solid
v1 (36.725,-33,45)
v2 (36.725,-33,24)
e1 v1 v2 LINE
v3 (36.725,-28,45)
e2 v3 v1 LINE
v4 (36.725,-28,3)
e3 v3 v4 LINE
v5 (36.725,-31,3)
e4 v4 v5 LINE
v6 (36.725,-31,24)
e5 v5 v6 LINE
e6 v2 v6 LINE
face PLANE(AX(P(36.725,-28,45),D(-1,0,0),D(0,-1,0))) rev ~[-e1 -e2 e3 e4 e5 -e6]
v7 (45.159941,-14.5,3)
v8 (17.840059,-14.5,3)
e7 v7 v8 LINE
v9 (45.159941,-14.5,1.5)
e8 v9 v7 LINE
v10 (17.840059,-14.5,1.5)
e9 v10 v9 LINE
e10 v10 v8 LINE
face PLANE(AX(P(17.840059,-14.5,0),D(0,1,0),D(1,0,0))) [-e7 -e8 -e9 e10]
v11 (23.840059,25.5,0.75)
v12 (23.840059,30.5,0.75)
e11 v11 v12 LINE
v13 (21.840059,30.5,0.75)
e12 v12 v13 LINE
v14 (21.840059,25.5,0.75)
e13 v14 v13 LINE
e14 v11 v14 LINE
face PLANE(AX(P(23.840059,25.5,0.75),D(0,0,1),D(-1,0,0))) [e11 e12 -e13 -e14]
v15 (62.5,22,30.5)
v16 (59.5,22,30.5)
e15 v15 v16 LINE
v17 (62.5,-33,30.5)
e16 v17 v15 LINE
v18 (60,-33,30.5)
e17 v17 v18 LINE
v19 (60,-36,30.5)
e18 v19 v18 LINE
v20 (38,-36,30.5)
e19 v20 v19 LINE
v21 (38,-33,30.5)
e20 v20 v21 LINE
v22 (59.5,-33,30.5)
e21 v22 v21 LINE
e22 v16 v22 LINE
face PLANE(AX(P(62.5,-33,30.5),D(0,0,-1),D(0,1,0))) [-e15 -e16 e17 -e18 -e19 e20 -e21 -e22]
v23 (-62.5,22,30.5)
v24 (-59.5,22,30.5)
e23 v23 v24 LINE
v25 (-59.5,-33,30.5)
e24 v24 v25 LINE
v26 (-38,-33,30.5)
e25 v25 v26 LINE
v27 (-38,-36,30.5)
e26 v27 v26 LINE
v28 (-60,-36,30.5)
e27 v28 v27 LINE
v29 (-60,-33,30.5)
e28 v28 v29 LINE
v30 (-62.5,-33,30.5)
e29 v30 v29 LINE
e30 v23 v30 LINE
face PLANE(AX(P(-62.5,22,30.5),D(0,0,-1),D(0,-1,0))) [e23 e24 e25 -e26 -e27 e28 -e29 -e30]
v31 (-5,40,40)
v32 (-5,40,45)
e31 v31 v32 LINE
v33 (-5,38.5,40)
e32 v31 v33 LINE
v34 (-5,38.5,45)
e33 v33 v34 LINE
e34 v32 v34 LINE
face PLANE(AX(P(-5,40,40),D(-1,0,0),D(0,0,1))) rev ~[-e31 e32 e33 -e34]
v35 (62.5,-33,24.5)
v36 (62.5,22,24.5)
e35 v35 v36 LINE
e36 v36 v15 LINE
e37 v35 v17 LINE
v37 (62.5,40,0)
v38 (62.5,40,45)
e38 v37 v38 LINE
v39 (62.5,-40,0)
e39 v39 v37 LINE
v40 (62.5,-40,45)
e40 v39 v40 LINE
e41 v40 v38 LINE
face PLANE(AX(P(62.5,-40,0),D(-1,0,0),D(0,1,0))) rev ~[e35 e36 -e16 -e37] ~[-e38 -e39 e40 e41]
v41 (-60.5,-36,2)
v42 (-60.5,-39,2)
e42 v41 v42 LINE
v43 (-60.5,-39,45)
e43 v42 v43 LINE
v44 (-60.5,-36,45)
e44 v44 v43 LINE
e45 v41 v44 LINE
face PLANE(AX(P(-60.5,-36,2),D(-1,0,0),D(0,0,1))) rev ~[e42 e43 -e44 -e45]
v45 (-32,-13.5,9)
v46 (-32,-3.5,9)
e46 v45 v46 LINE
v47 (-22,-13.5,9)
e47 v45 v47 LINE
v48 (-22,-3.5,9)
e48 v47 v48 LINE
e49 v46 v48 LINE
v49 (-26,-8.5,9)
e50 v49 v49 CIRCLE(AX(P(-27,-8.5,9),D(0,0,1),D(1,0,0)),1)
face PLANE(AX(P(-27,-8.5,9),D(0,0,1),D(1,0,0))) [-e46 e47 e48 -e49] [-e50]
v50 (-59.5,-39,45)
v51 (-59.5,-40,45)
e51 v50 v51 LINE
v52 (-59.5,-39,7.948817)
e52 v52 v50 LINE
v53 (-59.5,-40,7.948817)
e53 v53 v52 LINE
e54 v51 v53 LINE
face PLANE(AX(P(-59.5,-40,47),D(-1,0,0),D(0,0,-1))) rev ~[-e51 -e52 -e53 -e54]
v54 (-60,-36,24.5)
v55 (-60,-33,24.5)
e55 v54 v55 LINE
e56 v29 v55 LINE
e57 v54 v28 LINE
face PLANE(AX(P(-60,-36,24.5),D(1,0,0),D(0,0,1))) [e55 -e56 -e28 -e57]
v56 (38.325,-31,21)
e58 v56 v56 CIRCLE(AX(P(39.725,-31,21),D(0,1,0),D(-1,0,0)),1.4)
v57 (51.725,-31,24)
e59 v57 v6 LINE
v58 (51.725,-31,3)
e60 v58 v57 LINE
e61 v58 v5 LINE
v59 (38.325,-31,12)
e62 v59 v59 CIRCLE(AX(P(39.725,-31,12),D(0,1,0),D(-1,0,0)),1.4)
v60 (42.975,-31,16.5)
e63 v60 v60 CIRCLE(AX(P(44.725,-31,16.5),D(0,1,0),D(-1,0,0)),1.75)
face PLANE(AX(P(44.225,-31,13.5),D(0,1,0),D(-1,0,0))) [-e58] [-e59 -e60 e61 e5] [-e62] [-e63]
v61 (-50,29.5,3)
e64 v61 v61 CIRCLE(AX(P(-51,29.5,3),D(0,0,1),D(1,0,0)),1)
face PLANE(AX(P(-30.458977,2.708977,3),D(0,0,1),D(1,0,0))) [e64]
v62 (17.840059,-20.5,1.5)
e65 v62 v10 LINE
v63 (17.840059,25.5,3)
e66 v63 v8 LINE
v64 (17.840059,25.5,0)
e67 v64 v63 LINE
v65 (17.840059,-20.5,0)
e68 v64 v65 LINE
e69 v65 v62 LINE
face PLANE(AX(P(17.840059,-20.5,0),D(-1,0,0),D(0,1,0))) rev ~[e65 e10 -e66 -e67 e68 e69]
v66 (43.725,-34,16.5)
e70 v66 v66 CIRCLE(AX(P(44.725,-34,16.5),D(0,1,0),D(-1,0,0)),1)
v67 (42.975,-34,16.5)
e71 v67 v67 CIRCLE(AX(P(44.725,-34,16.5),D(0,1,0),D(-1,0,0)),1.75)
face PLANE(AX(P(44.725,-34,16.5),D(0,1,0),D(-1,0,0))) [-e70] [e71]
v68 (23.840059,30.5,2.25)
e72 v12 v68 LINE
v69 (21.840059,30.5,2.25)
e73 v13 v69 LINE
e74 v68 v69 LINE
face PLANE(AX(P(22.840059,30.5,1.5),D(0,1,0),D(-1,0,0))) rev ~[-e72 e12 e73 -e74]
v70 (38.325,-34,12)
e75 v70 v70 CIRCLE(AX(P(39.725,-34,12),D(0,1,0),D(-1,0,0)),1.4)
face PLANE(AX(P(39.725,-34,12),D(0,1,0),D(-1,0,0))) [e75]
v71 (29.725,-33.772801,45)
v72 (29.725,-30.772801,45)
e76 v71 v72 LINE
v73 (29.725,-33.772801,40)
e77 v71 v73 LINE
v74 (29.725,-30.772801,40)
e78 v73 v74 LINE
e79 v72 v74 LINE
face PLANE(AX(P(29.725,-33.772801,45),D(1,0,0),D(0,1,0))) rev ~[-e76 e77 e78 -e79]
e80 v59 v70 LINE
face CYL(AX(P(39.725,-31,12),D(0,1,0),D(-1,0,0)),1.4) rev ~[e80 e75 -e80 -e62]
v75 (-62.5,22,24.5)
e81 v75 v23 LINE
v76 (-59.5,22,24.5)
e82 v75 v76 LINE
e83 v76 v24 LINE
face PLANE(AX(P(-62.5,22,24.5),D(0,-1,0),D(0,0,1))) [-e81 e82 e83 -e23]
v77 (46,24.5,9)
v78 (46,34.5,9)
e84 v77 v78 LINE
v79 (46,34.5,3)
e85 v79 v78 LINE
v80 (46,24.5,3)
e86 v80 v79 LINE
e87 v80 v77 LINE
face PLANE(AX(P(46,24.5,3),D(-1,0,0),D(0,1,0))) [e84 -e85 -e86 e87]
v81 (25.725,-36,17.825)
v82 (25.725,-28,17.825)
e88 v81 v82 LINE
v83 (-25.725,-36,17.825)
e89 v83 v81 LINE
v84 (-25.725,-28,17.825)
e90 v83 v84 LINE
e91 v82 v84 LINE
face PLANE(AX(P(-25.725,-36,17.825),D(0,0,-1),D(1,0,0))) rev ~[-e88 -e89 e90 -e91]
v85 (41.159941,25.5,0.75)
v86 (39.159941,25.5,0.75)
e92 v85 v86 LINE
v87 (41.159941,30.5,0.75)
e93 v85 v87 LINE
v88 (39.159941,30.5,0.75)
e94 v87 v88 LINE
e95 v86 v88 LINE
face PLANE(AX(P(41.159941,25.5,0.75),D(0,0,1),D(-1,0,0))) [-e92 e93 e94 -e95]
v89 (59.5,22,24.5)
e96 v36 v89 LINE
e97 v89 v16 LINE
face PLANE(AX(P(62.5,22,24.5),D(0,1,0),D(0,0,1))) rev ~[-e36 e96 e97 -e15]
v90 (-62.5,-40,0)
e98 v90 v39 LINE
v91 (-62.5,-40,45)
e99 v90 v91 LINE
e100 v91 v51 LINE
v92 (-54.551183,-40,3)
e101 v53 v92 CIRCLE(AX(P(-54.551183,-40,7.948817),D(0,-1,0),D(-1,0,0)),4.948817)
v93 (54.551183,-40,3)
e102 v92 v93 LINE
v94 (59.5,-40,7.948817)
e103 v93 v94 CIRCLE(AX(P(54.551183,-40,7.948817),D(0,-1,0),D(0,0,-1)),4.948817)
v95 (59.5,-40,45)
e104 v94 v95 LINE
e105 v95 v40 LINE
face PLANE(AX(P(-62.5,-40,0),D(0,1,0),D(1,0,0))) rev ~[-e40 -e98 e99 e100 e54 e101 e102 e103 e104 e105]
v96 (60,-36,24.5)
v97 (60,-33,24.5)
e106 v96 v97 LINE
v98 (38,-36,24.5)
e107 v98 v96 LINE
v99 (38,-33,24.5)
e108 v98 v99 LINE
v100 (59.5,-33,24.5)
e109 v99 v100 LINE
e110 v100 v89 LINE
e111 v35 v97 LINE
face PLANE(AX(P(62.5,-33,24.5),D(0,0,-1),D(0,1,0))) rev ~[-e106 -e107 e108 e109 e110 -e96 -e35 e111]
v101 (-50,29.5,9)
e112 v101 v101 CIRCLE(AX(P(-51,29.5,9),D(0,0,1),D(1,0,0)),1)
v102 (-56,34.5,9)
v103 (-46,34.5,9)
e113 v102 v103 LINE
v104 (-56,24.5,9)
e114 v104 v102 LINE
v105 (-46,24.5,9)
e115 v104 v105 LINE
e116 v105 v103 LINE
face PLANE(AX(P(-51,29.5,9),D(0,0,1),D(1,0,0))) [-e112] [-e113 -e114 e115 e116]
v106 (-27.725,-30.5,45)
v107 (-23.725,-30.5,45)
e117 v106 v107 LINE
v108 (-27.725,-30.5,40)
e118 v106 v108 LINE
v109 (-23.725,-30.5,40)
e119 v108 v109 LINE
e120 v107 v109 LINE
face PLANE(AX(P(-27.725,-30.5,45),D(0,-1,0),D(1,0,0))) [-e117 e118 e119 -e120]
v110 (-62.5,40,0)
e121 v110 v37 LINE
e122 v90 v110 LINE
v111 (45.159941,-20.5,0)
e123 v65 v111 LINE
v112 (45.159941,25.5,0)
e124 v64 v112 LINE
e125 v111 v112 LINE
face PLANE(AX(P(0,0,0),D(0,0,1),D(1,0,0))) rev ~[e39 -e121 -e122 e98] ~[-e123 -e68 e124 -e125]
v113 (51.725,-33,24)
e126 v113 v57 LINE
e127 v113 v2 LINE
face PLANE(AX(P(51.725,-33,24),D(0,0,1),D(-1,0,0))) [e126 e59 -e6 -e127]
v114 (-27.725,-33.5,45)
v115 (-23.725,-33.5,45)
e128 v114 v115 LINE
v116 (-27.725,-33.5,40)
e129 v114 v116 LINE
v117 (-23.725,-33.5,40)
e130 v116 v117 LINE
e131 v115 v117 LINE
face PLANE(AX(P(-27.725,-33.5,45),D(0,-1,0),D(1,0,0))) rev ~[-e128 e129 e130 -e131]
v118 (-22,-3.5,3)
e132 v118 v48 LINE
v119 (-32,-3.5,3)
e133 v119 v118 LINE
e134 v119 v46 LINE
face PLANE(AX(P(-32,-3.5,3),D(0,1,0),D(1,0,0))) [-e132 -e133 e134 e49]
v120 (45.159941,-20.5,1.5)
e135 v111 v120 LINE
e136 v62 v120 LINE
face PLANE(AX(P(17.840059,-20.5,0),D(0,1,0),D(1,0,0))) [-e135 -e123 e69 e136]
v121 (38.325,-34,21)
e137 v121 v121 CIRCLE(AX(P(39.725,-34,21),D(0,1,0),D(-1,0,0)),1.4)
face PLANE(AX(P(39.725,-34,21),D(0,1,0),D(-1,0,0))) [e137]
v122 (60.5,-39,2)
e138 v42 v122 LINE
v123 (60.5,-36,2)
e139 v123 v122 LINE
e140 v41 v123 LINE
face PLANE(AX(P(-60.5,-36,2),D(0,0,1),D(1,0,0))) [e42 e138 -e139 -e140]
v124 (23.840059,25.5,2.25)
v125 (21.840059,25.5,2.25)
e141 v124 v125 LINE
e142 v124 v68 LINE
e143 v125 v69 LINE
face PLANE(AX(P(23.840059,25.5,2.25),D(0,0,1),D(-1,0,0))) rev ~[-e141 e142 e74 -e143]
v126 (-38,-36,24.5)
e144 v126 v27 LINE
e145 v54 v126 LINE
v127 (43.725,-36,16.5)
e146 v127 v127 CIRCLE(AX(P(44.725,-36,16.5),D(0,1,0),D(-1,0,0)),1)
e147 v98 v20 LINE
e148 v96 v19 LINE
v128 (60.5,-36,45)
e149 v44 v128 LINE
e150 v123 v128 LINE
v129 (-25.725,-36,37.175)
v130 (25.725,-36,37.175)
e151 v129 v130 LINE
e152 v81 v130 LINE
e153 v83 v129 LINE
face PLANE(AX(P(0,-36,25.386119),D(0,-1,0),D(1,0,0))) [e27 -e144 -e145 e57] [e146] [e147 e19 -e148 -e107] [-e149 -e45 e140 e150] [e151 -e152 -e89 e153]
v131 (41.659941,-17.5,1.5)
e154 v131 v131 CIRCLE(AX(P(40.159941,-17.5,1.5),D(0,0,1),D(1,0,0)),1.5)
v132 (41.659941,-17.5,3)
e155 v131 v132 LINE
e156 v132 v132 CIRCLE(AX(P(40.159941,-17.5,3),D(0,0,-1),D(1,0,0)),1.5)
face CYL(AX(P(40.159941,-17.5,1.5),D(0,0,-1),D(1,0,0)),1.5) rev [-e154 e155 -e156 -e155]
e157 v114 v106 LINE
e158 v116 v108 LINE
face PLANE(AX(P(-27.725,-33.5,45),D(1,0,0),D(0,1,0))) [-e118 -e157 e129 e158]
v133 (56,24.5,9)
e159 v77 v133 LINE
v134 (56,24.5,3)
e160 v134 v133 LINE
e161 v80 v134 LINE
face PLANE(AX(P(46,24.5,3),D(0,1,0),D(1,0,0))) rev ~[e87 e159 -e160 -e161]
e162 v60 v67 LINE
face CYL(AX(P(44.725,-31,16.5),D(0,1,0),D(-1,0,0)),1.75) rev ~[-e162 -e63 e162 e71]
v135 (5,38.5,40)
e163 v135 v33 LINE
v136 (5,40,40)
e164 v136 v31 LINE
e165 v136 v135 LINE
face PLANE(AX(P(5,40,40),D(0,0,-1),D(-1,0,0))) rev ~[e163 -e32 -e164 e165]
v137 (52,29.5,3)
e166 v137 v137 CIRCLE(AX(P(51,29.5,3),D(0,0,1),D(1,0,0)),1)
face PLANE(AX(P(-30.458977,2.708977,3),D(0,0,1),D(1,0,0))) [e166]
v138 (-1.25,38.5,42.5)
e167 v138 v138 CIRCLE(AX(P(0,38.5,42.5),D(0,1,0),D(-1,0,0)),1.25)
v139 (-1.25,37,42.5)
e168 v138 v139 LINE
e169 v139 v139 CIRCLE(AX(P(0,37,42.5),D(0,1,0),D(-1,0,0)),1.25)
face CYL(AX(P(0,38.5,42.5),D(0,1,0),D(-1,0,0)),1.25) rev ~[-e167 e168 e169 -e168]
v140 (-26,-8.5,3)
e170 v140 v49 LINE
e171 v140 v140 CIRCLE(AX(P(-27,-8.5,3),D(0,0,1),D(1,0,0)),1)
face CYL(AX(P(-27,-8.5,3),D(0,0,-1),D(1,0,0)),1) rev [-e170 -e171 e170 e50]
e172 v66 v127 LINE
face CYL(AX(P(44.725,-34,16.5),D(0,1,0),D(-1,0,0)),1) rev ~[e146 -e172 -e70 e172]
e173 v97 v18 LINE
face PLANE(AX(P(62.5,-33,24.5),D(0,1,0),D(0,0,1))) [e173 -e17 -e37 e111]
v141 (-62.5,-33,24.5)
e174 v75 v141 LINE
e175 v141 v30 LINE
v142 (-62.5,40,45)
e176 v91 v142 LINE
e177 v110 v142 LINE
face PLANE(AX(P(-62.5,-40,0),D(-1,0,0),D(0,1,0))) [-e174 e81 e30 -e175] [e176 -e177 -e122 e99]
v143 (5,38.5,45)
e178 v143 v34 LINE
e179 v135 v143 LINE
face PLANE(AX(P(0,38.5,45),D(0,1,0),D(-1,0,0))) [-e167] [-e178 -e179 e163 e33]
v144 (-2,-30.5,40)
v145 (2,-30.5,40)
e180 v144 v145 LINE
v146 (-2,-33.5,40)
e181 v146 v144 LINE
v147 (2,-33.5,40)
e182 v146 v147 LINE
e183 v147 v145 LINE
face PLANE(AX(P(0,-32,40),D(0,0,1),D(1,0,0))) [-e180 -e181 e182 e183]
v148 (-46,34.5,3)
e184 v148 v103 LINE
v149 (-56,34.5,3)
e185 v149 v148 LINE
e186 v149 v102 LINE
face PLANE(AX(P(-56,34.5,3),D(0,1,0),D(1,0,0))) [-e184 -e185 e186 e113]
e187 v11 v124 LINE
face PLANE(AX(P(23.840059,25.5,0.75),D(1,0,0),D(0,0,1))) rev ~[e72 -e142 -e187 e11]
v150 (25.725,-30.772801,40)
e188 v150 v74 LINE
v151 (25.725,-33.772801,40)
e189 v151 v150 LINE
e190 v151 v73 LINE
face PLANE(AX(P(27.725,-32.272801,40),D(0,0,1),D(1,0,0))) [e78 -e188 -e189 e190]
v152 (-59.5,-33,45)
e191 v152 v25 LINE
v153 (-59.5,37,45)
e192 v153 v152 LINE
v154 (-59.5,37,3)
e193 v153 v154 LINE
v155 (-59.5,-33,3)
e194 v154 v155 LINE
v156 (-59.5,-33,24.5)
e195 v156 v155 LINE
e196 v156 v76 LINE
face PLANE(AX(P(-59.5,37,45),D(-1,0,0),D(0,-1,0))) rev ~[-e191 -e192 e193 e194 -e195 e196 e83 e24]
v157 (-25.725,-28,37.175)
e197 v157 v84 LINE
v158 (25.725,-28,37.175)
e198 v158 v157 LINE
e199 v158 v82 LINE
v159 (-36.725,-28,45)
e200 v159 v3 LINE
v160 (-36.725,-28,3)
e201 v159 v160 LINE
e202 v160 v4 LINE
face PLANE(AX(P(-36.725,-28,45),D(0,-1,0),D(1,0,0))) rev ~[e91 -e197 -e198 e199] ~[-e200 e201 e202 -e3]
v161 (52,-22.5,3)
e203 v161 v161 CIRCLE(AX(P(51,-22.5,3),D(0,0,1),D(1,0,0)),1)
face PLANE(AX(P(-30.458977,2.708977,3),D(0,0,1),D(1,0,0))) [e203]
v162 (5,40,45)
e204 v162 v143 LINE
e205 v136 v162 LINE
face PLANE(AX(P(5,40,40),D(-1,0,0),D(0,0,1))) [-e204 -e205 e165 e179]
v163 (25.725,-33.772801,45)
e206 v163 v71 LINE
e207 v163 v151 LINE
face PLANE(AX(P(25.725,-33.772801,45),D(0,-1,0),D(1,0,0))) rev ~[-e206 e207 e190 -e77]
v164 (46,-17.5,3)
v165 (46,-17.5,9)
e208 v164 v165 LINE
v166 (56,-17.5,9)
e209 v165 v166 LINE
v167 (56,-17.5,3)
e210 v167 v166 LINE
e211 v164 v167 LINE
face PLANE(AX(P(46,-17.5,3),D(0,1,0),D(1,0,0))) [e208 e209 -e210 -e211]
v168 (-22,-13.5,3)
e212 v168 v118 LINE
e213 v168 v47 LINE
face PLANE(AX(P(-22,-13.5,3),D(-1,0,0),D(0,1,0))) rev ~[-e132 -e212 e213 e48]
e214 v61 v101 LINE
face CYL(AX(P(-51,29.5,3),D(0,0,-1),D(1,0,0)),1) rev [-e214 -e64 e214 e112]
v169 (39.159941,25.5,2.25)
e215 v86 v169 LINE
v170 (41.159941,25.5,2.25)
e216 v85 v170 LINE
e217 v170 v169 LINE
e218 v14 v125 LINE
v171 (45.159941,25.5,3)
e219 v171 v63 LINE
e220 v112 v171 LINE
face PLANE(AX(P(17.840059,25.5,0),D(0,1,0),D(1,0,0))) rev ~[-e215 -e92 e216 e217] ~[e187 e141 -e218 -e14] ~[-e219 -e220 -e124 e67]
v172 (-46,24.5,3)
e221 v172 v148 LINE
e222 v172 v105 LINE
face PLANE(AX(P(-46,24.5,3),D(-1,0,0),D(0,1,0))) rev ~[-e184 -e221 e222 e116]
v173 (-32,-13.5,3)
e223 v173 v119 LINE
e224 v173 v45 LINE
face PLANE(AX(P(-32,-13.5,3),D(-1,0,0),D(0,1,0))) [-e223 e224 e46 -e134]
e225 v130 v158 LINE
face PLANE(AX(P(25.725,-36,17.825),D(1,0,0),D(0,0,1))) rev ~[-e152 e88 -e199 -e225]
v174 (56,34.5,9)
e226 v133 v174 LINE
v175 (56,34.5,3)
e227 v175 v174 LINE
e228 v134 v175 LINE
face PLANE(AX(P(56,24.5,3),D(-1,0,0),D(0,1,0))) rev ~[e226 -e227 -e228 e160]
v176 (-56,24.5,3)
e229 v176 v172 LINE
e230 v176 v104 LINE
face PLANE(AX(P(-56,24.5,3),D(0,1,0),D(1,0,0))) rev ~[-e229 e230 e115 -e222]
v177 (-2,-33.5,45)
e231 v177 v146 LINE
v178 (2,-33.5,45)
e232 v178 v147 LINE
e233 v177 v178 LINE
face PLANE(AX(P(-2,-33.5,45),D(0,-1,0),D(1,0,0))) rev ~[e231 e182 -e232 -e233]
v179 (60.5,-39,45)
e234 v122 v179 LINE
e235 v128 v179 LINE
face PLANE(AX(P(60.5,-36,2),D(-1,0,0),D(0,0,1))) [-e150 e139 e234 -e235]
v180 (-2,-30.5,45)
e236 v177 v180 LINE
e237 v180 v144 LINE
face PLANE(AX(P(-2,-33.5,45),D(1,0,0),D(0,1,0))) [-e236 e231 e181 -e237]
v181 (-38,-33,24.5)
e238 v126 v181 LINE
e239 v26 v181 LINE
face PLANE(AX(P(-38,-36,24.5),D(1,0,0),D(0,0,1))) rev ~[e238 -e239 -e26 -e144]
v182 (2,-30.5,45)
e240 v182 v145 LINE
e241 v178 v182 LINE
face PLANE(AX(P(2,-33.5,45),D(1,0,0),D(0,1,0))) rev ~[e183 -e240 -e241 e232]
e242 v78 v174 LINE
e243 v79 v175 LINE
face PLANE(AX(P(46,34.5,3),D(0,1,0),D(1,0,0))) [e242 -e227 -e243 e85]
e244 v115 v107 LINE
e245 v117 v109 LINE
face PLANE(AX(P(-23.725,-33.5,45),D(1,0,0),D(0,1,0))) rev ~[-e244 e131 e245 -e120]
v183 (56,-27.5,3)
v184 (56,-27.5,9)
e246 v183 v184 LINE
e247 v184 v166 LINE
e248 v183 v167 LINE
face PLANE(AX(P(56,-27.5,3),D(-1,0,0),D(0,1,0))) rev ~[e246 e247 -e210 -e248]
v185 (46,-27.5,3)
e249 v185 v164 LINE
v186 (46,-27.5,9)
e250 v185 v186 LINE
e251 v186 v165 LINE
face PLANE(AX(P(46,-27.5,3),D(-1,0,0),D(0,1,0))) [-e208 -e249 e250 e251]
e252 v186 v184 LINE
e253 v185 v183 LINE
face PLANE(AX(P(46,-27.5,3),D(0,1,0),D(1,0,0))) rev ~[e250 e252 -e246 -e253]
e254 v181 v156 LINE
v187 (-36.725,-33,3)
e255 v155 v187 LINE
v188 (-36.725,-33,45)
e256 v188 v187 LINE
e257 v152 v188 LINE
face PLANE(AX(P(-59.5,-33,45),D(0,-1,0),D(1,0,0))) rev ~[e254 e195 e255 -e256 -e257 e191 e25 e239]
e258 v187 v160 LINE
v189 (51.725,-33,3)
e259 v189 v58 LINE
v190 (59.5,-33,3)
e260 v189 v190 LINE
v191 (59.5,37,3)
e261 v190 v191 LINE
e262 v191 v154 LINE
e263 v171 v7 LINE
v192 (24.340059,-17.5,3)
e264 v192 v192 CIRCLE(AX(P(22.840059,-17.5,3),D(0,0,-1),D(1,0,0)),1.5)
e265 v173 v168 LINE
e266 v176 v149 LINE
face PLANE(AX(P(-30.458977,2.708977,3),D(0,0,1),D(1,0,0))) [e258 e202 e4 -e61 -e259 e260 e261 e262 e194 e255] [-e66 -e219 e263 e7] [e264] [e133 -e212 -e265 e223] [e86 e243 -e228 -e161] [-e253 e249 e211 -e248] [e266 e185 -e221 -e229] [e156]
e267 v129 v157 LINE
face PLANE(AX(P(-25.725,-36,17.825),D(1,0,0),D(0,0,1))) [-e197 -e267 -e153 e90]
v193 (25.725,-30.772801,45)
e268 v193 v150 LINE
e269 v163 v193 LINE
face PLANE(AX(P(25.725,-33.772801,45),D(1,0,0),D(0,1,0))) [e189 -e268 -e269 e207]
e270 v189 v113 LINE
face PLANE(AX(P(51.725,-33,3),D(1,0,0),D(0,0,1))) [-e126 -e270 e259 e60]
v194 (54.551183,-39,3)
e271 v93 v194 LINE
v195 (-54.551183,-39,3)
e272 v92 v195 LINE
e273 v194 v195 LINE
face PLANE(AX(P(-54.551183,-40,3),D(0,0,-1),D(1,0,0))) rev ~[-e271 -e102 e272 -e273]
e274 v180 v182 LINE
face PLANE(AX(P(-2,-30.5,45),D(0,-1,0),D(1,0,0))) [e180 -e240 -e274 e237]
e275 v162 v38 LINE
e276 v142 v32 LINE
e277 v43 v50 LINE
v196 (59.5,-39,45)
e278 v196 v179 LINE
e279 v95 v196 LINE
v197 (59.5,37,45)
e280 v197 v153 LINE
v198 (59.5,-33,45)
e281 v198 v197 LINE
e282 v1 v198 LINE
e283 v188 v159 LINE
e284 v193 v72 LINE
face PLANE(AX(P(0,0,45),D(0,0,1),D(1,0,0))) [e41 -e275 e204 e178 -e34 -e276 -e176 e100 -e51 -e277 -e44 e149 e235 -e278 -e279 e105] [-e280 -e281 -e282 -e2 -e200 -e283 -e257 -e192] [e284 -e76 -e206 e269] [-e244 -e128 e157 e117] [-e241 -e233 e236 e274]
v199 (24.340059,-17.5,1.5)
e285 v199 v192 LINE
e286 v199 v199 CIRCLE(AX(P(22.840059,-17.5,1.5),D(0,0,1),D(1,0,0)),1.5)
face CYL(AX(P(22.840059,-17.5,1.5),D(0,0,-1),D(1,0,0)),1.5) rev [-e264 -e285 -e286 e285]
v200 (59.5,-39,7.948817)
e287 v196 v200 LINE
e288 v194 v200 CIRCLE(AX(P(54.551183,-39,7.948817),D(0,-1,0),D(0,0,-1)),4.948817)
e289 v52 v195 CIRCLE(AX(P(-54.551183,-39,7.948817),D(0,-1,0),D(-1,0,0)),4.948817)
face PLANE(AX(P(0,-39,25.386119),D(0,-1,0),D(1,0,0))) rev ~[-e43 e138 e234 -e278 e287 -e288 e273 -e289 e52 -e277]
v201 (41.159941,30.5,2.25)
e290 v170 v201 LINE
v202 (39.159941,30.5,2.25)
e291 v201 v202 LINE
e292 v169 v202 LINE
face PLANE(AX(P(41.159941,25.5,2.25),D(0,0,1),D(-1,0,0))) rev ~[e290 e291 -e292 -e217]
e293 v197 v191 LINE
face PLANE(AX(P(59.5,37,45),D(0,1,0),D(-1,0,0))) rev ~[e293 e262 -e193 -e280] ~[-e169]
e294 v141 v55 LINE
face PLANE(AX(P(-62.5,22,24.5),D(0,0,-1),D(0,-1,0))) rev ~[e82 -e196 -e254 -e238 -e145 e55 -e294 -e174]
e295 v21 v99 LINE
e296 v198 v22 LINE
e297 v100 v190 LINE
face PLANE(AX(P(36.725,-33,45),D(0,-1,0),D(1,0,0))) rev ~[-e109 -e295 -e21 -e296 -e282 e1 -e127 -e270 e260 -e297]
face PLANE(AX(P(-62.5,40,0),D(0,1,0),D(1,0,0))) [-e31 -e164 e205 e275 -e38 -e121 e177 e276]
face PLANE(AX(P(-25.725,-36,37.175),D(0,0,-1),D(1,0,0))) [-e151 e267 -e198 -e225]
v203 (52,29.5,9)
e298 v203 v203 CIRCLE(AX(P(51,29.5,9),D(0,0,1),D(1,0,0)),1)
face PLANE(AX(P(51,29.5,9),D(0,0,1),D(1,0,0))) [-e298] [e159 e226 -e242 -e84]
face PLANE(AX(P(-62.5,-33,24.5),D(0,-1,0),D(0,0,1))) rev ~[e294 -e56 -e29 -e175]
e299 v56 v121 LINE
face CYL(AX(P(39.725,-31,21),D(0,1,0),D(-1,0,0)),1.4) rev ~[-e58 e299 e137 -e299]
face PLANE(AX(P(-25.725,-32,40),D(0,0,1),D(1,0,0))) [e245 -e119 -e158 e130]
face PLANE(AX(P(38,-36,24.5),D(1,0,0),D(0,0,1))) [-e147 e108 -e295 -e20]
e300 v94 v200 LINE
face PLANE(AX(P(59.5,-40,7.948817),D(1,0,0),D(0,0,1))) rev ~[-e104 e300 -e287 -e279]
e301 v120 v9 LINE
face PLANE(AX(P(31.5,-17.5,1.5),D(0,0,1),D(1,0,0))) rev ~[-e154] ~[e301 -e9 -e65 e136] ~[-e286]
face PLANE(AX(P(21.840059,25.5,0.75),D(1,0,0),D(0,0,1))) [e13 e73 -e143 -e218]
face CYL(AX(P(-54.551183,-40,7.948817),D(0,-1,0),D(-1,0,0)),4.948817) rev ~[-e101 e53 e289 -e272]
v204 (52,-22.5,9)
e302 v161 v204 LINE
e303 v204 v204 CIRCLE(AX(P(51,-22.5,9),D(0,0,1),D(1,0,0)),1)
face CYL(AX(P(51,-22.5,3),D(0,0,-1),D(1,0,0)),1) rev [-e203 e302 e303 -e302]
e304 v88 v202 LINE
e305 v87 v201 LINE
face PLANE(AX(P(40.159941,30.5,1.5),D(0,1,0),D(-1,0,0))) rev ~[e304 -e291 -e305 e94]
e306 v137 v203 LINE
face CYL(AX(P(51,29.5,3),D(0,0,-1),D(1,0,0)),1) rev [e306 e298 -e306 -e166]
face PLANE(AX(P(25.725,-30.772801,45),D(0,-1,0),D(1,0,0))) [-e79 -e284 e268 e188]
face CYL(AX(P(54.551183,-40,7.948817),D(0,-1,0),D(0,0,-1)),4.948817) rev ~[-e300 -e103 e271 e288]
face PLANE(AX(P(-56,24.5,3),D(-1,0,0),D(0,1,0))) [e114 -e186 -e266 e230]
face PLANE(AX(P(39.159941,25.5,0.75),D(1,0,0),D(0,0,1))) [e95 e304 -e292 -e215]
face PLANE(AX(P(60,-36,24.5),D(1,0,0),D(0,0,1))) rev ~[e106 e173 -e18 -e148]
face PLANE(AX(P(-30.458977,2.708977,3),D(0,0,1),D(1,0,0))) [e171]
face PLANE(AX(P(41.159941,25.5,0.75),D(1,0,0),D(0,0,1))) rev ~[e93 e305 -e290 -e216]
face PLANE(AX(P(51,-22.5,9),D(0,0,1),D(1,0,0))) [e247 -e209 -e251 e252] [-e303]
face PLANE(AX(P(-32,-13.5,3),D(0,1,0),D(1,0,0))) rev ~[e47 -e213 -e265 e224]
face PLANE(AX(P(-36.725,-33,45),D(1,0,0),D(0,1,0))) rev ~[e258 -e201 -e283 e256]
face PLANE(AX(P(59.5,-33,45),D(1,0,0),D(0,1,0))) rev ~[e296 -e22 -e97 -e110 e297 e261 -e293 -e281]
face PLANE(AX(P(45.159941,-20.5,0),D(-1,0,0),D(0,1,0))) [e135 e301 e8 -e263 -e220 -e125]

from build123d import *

# Parameters (mm, degrees)
F0_W      = 125
F0_H      = 80
F1_DEPTH  = 45
F3_DEPTH  = 4
F4_W      = 121
F4_H      = 46.7722373752
F5_DEPTH  = 3
F6_W      = 51.45
F6_H      = 19.35
F6_W_2    = 22
F6_H_2    = 6
F7_DEPTH  = 50
F9_DEPTH  = 42
F10_W     = 10
F10_H     = 10
F10_R     = 1
F11_DEPTH = 6
F12_W     = 55
F12_H     = 6
F13_DEPTH = 10
F14_W     = 55
F14_H     = 6
F15_DEPTH = 10
F16_W     = 27.3198820651
F16_H     = 40
F17_DEPTH = 25
F19_W     = 2
F19_H     = 1.5
F20_DEPTH = 5
F21_W     = 27.3198820651
F21_H     = 6
F22_DEPTH = 1.5
F24_R     = 1.5
F25_DEPTH = 10
F26_W     = 4
F26_H     = 3
F27_DEPTH = 5
F28_W     = 10
F28_H     = 10
F29_DEPTH = 1.5
F30_R     = 1.25
F31_DEPTH = 10
F32_W     = 15
F32_H     = 21
F33_DEPTH = 2
F34_R     = 1.4
F34_R_2   = 1.75
F35_DEPTH = 3
F36_R     = 1
F37_DEPTH = 25


# Not quite as in the source:
# - a feature names something its author has since deleted; it is built from what else it names


with BuildPart() as f1:
    # F0 (on Top) → F1 (new body)
    with BuildSketch(Plane.XY):
        Rectangle(F0_W, F0_H)
    extrude(amount=F1_DEPTH)

    # F2 (on face) → F3 (cut)
    with BuildSketch(Plane.XZ.offset(40)):
        with BuildLine():
            Line((-59.5, 47), (-59.5, 7.948817455))
            ThreePointArc((-59.5, 7.948817455), (-58.0505249263, 4.4494750737), (-54.551182545, 3))
            Line((-54.551182545, 3), (0, 3))
            Line((0, 3), (54.551182545, 3))
            ThreePointArc((54.551182545, 3), (58.0505249263, 4.4494750737), (59.5, 7.948817455))
            Line((59.5, 7.948817455), (59.5, 47))
            Line((59.5, 47), (0, 47))
            Line((0, 47), (-59.5, 47))
        make_face()
    extrude(amount=-F3_DEPTH, mode=Mode.SUBTRACT)

    # F4 (on face) → F5 (cut)
    with BuildSketch(Plane.XZ.offset(36)):
        with Locations((0, 25.3861186876)):
            Rectangle(F4_W, F4_H)
    extrude(amount=F5_DEPTH, mode=Mode.SUBTRACT)

    # F6 (on face) → F7 (cut)
    with BuildSketch(Plane.XZ.offset(36)):
        with Locations((0, 27.5)):
            Rectangle(F6_W, F6_H)
        with Locations((-49, 27.5)):
            Rectangle(F6_W_2, F6_H_2)
        with Locations((49, 27.5)):
            Rectangle(F6_W_2, F6_H_2)
    extrude(amount=-F7_DEPTH, mode=Mode.SUBTRACT)

    # F8 (on face) → F9 (cut)
    with BuildSketch(Plane.XY.offset(45)):
        Polygon((-36.725, -28), (0, -28), (0, 37), (-59.5, 37), (-59.5, -33), (-36.725, -33), align=None)
        Polygon((0, 37), (0, -28), (36.725, -28), (36.725, -33), (59.5, -33), (59.5, 37), align=None)
    extrude(amount=-F9_DEPTH, mode=Mode.SUBTRACT)

    # F10 (on face) → F11 (join)
    with BuildSketch(Plane.XY.offset(3)):
        with Locations((-51, 29.5)):
            Rectangle(F10_W, F10_H)
        with Locations((-51, 29.5)):
            Circle(F10_R, mode=Mode.SUBTRACT)
        with Locations((51, 29.5)):
            Rectangle(F10_W, F10_H)
        with Locations((51, 29.5)):
            Circle(F10_R, mode=Mode.SUBTRACT)
        with Locations((51, -22.5)):
            Rectangle(F10_W, F10_H)
        with Locations((51, -22.5)):
            Circle(F10_R, mode=Mode.SUBTRACT)
        with Locations((-27, -8.5)):
            Rectangle(F10_W, F10_H)
        with Locations((-27, -8.5)):
            Circle(F10_R, mode=Mode.SUBTRACT)
    extrude(amount=F11_DEPTH)

    # F12 (on face) → F13 (cut)
    with BuildSketch(Plane(origin=(-62.5, 0, 0), x_dir=(0, -1, 0), z_dir=(-1, 0, 0))):
        with Locations((5.5, 27.5)):
            Rectangle(F12_W, F12_H)
    extrude(amount=-F13_DEPTH, mode=Mode.SUBTRACT)

    # F14 (on face) → F15 (cut)
    with BuildSketch(Plane.YZ.offset(62.5)):
        with Locations((-5.5, 27.5)):
            Rectangle(F14_W, F14_H)
    extrude(amount=-F15_DEPTH, mode=Mode.SUBTRACT)

    # F16 (on face) → F17 (cut)
    with BuildSketch(Plane.XY):
        with Locations((31.5, 5.5)):
            Rectangle(F16_W, F16_H)
    extrude(amount=F17_DEPTH, mode=Mode.SUBTRACT)

    # F19 (on offset) → F20 (cut)
    with BuildSketch(Plane(origin=(0, 25.5, 0), x_dir=(-1, 0, 0), z_dir=(0, 1, 0))):
        with Locations((-22.8400589675, 1.5)):
            Rectangle(F19_W, F19_H)
        with Locations((-40.1599410325, 1.5)):
            Rectangle(F19_W, F19_H)
    extrude(amount=F20_DEPTH, mode=Mode.SUBTRACT)

    # F21 (on face) → F22 (cut)
    with BuildSketch(Plane.XY):
        with Locations((31.5, -17.5)):
            Rectangle(F21_W, F21_H)
    extrude(amount=F22_DEPTH, mode=Mode.SUBTRACT)

    # F24 (on offset) → F25 (cut)
    with BuildSketch(Plane.XY.offset(1.5)):
        with Locations((22.8400589675, -17.5)):
            Circle(F24_R)
        with Locations((40.1599410325, -17.5)):
            Circle(F24_R)
    extrude(amount=F25_DEPTH, mode=Mode.SUBTRACT)

    # F26 (on face) → F27 (cut)
    with BuildSketch(Plane.XY.offset(45)):
        with Locations((0, -32)):
            Rectangle(F26_W, F26_H)
        with Locations((-25.725, -32)):
            Rectangle(F26_W, F26_H)
        with Locations((27.725, -32.2728008032)):
            Rectangle(F26_W, F26_H)
    extrude(amount=-F27_DEPTH, mode=Mode.SUBTRACT)

    # F28 (on face) → F29 (cut)
    with BuildSketch(Plane(origin=(0, 40, 0), x_dir=(-1, 0, 0), z_dir=(0, 1, 0))):
        with Locations((0, 45)):
            Rectangle(F28_W, F28_H)
    extrude(amount=-F29_DEPTH, mode=Mode.SUBTRACT)

    # F30 (on face) → F31 (cut)
    with BuildSketch(Plane(origin=(0, 38.5, 0), x_dir=(-1, 0, 0), z_dir=(0, 1, 0))):
        with Locations((0, 42.5)):
            Circle(F30_R)
    extrude(amount=-F31_DEPTH, mode=Mode.SUBTRACT)

    # F32 (on face) → F33 (join)
    with BuildSketch(Plane(origin=(0, -33, 0), x_dir=(-1, 0, 0), z_dir=(0, 1, 0))):
        with Locations((-44.225, 13.5)):
            Rectangle(F32_W, F32_H)
    extrude(amount=F33_DEPTH)

    # F34 (on face) → F35 (cut)
    with BuildSketch(Plane(origin=(0, -31, 0), x_dir=(-1, 0, 0), z_dir=(0, 1, 0))):
        with Locations((-39.725, 21)):
            Circle(F34_R)
        with Locations((-39.725, 12)):
            Circle(F34_R)
        with Locations((-44.725, 16.5)):
            Circle(F34_R_2)
    extrude(amount=-F35_DEPTH, mode=Mode.SUBTRACT)

    # F36 (on face) → F37 (cut)
    with BuildSketch(Plane(origin=(0, -34, 0), x_dir=(-1, 0, 0), z_dir=(0, 1, 0))):
        with Locations((-44.725, 16.5)):
            Circle(F36_R)
    extrude(amount=-F37_DEPTH, mode=Mode.SUBTRACT)


solid = f1.part
